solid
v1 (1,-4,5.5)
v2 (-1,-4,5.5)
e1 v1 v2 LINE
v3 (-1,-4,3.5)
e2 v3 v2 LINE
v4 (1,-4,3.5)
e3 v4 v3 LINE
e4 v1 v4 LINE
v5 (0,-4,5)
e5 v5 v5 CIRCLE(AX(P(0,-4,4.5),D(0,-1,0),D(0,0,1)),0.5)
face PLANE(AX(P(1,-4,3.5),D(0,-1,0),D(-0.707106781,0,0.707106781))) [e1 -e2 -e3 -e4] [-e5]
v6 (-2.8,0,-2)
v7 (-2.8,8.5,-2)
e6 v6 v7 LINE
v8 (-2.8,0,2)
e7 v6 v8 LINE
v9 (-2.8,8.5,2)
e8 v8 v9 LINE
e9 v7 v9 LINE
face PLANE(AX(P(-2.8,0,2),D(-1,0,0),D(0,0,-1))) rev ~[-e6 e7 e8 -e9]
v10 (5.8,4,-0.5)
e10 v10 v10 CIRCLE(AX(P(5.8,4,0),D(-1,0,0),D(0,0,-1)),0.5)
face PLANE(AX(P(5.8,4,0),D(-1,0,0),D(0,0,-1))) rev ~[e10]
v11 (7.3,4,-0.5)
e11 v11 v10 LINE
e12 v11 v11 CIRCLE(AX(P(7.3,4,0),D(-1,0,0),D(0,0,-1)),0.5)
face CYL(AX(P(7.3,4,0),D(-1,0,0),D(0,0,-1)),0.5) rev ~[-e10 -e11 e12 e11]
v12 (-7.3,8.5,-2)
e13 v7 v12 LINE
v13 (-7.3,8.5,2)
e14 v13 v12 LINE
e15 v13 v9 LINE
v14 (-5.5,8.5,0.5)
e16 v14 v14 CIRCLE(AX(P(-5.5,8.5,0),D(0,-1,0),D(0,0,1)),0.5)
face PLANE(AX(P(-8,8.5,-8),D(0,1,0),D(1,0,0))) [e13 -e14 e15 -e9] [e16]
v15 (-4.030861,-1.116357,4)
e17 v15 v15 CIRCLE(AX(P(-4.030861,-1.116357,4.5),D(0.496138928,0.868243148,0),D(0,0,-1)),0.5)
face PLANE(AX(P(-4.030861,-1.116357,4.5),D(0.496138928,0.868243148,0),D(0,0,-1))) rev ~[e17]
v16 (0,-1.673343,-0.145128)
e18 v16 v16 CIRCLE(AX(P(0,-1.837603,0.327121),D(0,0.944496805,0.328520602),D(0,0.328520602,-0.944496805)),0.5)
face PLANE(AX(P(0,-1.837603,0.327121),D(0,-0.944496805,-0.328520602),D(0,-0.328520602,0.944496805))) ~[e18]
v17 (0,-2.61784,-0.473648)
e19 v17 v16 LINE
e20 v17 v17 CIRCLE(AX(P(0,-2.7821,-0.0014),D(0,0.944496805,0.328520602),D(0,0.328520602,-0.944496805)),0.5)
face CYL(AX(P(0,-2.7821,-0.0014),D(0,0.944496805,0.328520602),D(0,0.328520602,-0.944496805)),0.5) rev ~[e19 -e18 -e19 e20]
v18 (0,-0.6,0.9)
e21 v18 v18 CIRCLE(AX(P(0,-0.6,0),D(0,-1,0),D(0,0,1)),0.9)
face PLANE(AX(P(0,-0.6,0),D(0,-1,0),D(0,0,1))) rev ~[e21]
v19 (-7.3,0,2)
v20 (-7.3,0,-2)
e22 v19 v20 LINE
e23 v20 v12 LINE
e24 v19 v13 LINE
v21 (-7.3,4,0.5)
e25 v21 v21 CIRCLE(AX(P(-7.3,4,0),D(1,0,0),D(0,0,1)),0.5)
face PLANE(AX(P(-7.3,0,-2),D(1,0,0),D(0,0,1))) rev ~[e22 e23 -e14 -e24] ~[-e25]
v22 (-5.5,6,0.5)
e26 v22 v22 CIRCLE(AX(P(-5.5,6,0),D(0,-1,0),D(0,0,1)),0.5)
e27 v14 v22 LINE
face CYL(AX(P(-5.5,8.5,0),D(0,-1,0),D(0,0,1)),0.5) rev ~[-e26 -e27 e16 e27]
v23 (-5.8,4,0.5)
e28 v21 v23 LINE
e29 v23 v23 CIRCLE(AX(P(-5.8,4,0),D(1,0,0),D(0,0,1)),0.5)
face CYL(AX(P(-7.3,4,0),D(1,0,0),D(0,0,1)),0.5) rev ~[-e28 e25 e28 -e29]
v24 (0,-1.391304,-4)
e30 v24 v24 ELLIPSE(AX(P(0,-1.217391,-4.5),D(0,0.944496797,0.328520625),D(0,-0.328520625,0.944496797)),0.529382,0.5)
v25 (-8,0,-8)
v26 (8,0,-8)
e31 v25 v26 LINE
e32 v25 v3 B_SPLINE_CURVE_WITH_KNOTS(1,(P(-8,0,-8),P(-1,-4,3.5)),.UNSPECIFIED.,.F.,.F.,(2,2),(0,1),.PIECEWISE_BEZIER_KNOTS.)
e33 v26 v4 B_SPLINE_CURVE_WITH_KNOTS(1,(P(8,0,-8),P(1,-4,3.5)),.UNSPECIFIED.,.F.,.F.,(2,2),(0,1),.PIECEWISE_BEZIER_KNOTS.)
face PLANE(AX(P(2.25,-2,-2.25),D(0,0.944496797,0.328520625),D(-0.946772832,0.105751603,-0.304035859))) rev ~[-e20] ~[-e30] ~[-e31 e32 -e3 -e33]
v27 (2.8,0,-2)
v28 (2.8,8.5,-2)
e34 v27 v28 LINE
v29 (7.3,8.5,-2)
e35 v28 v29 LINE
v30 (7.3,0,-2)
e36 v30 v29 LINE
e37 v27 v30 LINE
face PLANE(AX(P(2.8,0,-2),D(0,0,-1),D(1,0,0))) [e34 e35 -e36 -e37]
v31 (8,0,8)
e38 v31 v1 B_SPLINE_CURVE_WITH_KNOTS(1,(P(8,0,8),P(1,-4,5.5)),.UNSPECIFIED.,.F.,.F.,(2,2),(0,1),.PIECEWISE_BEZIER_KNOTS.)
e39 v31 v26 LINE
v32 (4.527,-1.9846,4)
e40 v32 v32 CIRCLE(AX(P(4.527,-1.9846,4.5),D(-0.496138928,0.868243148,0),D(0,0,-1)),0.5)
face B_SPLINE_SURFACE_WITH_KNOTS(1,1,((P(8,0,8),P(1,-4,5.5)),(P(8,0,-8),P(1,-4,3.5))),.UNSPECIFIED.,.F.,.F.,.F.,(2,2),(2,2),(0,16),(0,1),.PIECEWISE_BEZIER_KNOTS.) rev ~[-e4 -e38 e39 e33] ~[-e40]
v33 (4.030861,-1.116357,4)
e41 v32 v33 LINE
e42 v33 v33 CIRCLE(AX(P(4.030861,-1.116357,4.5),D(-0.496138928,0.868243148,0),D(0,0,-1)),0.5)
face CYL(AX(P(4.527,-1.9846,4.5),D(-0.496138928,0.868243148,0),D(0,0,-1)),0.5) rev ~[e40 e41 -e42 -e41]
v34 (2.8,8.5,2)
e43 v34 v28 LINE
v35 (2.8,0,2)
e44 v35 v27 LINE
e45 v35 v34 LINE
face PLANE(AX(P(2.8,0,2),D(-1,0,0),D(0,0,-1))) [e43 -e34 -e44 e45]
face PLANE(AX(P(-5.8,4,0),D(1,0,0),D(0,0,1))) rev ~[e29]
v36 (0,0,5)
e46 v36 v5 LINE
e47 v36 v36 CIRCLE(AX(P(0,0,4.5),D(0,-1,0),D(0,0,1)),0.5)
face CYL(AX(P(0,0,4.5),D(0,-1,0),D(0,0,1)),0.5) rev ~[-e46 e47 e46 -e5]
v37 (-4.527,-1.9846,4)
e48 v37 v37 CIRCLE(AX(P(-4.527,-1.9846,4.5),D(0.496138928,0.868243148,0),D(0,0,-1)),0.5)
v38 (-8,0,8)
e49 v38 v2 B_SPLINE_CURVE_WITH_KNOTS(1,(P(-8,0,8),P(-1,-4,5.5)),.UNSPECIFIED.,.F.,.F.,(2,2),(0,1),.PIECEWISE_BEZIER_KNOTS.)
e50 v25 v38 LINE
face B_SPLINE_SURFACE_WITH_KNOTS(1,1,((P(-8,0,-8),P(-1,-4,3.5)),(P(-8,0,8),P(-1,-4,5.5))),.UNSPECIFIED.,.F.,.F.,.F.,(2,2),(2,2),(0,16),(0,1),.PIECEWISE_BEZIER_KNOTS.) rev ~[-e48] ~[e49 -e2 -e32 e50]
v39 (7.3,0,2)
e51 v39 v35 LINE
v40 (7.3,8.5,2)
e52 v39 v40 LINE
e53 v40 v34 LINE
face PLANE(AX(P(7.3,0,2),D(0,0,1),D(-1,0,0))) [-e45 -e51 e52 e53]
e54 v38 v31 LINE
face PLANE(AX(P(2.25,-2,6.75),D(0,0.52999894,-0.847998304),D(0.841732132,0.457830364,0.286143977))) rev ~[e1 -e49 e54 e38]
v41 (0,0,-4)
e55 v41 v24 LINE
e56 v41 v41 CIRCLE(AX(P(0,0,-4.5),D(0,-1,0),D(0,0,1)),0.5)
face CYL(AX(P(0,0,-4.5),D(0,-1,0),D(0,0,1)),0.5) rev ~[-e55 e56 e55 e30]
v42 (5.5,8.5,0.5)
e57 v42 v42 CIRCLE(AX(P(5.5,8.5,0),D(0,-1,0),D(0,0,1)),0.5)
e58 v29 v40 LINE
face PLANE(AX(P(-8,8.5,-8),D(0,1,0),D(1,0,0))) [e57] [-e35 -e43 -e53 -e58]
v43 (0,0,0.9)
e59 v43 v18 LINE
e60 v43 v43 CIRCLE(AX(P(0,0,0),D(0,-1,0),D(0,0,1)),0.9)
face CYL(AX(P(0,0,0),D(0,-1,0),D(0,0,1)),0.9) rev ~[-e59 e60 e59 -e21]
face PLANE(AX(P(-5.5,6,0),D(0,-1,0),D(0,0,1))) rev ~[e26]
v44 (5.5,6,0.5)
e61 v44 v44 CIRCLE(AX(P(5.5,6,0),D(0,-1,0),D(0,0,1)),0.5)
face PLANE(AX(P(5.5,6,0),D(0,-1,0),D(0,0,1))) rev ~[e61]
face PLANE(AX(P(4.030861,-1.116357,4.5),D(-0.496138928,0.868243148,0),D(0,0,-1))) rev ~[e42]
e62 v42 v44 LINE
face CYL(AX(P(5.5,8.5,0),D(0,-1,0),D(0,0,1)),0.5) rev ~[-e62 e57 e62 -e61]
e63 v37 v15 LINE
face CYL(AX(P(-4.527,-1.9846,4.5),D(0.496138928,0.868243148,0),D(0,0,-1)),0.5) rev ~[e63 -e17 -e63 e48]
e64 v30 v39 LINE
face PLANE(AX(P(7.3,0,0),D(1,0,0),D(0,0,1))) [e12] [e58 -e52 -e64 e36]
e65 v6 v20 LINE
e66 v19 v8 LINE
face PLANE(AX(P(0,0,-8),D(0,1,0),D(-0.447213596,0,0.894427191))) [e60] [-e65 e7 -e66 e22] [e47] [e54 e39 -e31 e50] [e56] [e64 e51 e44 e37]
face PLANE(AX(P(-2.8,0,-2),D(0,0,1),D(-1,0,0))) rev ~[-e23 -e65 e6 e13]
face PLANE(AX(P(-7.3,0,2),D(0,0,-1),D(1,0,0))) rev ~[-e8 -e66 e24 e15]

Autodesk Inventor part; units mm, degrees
ref_plane "YZ Plane" through (0, 0, 0) normal (1, 0, 0) x (0, 1, 0)
ref_plane "XZ Plane" through (0, 0, 0) normal (0, 1, 0) x (-1, 0, 0)
sketch "Sketch1" plane through (0, 0, 0) normal (0, 1, 0) x (-1, 0, 0)
  line L0 (-8, 0) -> (-8, 8)
  line L1 (-8, 8) -> (8, 8)
  line L2 (8, 8) -> (8, -8)
  line L3 (8, -8) -> (-8, -8)
  line L4 (-8, -8) -> (-8, 0)
  circle A0 centre (0, 0) radius 1.5
  line L5 (8, 8) -> (8, 4.5)
  line L6 (8, 4.5) -> (5, 4.5)
  line L7 (-8, 8) -> (-8, 4.5)
  line L8 (-8, 4.5) -> (-5, 4.5)
  line L9 (0, 0) -> (0, 4.5)
  dimension "d0" = 8
  dimension "d1" = 8
  dimension "d2" = 16
  dimension "d3" = 16
  dimension "d4" = 16
  dimension "d5" = 8
  dimension "d25" = 3
  dimension "d95" = 3.5
  dimension "d96" = 3
  dimension "d106" = 3.5
  dimension "d107" = 3
  dimension "d196" = 4.5
ref_plane "Work Plane2" through (8, -4, 0) normal (0, -1, 0) x (0, 0, 1)
sketch "Sketch3" plane through (8, -4, 0) normal (0, -1, 0) x (0, 0, 1)
  line L0 (5.5, 8) -> (5.5, 7)
  line L1 (5.5, 7) -> (3.5, 7)
  line L2 (3.5, 7) -> (3.5, 9)
  line L3 (3.5, 9) -> (5.5, 9)
  line L4 (5.5, 9) -> (5.5, 8)
  line L5 (0, 8) -> (3.5, 8)
  dimension "d16" = 1
  dimension "d17" = 2
  dimension "d18" = 2
  dimension "d19" = 2
  dimension "d20" = 1
  dimension "d27" = 3.5
loft "Loft1" add profiles "Sketch1", "Sketch3" contours L0 L1 L2 L3 L4 | A0 / all
sketch "Sketch5" plane through (-8, 0, -8) normal (0, 1, 0) x (1, 0, 0)
  line L0 (8, -8) -> (8, -12.5)
  circle A0 centre (8, -12.5) radius 0.5
  dimension "d28" = 4.5
  dimension "d29" = 1
hole "Hole1" at (0, 0, 4.5) direction (0, -1, 0) diameter 1 depth 4
sketch "Sketch6" plane through (-8, 0, -8) normal (0, 1, 0) x (1, 0, 0)
  line L0 (8, -8) -> (10.8, -8)
  line L1 (16, 0) -> (16, -16) projected
  line L2 (10.8, -8) -> (10.8, -6)
  line L3 (10.8, -6) -> (15.3, -6)
  line L4 (15.3, -6) -> (15.3, -10)
  line L5 (15.3, -10) -> (10.8, -10)
  line L6 (10.8, -10) -> (10.8, -8)
  line L7 (15.3, -8) -> (16, -8)
  dimension "d180" = 2
  dimension "d181" = 4.5
  dimension "d182" = 4
  dimension "d183" = 4.5
  dimension "d184" = 2
  dimension "d185" = 0.7
  dimension "d197" = 2.8
extrude "Extrusion1" add sketch "Sketch6" along normal blind 8.5
sketch "Sketch7" plane through (-8, 8.5, -8) normal (0, 1, 0) x (1, 0, 0)
  line L0 (8, -8) -> (13.5, -8)
  circle A0 centre (13.5, -8) radius 0.5
  circle A1 centre (13.5, -8) radius 0.75
  dimension "d48" = 5.5
  dimension "d49" = 1
  dimension "d57" = 1.5
hole "Hole2" at (5.5, 8.5, 0) direction (0, -1, 0) diameter 1 depth 2.5
sketch "Sketch8" plane through (-8, 0, -8) normal (0, 1, 0) x (1, 0, 0)
  line L0 (8, -8) -> (5.2, -8)
  line L1 (5.2, -8) -> (5.2, -6)
  line L2 (5.2, -6) -> (0.7, -6)
  line L3 (0.7, -6) -> (0.7, -10)
  line L4 (0.7, -10) -> (5.2, -10)
  line L5 (5.2, -10) -> (5.2, -8)
  line L6 (0.7, -8) -> (0, -8)
  dimension "d58" = 2.8
  dimension "d59" = 2
  dimension "d60" = 4.5
  dimension "d61" = 4
  dimension "d62" = 4.5
  dimension "d63" = 2
  dimension "d179" = 0.7
extrude "Extrusion2" add sketch "Sketch8" along normal blind 8.5
sketch "Sketch9" plane through (-8, 8.5, -8) normal (0, 1, 0) x (1, 0, 0)
  line L0 (8, -8) -> (2.5, -8)
  circle A0 centre (2.5, -8) radius 0.5
  circle A1 centre (2.5, -8) radius 0.75
  dimension "d66" = 5.5
  dimension "d67" = 1
  dimension "d75" = 1.5
hole "Hole3" at (-5.5, 8.5, 0) direction (0, -1, 0) diameter 1 depth 2.5
sketch "Sketch11" plane through (-7.3, 0, -2) normal (-1, 0, 0) x (0, 0, 1)
  line L0 (2, 0) -> (2, 4)
  circle A0 centre (2, 4) radius 0.5
  dimension "d85" = 4
  dimension "d86" = 1
hole "Hole5" at (-7.3, 4, 0) direction (1, 0, 0) diameter 1 depth 1.5
sketch "Sketch13" plane through (-8, 0, -8) normal (-0.4961389, -0.8682431, 0) x (0.8682431, -0.4961389, 0)
  line L0 (0, 16) -> (0, 0) projected
  line L1 (0, 16) -> (0, 12.5)
  line L2 (0, 12.5) -> (4, 12.5)
  circle A0 centre (4, 12.5) radius 0.25
  point P0 (6.9459, 8)
  dimension "d97" = 3.5
  dimension "d98" = 0.5
  dimension "d118" = 4
hole "Hole6" at (-4.527, -1.9846, 4.5) direction (0.4961389, 0.8682431, 0) diameter 1 depth 1
sketch "Sketch14" plane through (8, 0, -8) normal (0.4961389, -0.8682431, 0) x (0.8682431, 0.4961389, 0)
  line L0 (0, 16) -> (-8.0623, 13.5) projected
  line L1 (0, 16) -> (0, 12.5)
  line L2 (0, 0) -> (0, 16) projected
  line L3 (0, 12.5) -> (-4, 12.5)
  circle A0 centre (-4, 12.5) radius 0.25
  point P0 (-6.9459, 8)
  dimension "d108" = 3.5
  dimension "d109" = 0.5
  dimension "d117" = 4
hole "Hole7" at (4.527, -1.9846, 4.5) direction (-0.4961389, 0.8682431, 0) diameter 1 depth 1
sketch "Sketch15" plane through (-8, 0, -8) normal (0, -0.9444968, -0.3285206) x (1, 0, 0)
  line L0 (0, 0) -> (16, 0) projected
  line L1 (0, 0) -> (8, 0)
  line L2 (8, 0) -> (8, 8.4687)
  circle A0 centre (8, 8.4687) radius 0.25
  dimension "d119" = 8
  dimension "d120" = 0.5
hole "Hole8" at (0, -2.7821, -0.0014) direction (0, 0.9444968, 0.3285206) diameter 1 depth 1
sketch "Sketch17" plane through (-8, 0, -8) normal (0, 1, 0) x (1, 0, 0)
  line L0 (8, -8) -> (8, -3.5)
  circle A0 centre (8, -3.5) radius 0.25
  dimension "d128" = 4.5
  dimension "d129" = 0.5
hole "Hole9" at (0, 0, -4.5) direction (0, -1, 0) diameter 1 depth 3
sketch "Sketch21" plane through (-8, 0, -8) normal (0, 1, 0) x (1, 0, 0)
  circle A0 centre (8, -8) radius 0.8
  dimension "d171" = 1.6
hole "Hole12" at (0, 0, 0) direction (0, -1, 0) diameter 1.8 depth 0.6
sketch "Sketch22" plane through (7.3, 0, 2) normal (1, 0, 0) x (0, 0, -1)
  line L0 (2, 0) -> (2, 4)
  line L1 (2, 0) -> (6, 0) construction
  circle A0 centre (2, 4) radius 0.5
  dimension "d186" = 4
  dimension "d187" = 90
  dimension "d188" = 1
hole "Hole13" at (7.3, 4, 0) direction (-1, 0, 0) diameter 1 depth 1.5
sketch "Sketch23" plane through (-8, 0, -8) normal (0, 1, 0) x (1, 0, 0)
  line L0 (15.3, -10) -> (10.8, -10) projected
  line L1 (15.3, -10) -> (15.3, -15)
  point P0 (8, -8)
  dimension "d198" = 5
ref_plane "Work Plane" through (8, 0, 0) normal (0, -1, 0) x (0, 0, 1)
properties material "ABS Plastic"
